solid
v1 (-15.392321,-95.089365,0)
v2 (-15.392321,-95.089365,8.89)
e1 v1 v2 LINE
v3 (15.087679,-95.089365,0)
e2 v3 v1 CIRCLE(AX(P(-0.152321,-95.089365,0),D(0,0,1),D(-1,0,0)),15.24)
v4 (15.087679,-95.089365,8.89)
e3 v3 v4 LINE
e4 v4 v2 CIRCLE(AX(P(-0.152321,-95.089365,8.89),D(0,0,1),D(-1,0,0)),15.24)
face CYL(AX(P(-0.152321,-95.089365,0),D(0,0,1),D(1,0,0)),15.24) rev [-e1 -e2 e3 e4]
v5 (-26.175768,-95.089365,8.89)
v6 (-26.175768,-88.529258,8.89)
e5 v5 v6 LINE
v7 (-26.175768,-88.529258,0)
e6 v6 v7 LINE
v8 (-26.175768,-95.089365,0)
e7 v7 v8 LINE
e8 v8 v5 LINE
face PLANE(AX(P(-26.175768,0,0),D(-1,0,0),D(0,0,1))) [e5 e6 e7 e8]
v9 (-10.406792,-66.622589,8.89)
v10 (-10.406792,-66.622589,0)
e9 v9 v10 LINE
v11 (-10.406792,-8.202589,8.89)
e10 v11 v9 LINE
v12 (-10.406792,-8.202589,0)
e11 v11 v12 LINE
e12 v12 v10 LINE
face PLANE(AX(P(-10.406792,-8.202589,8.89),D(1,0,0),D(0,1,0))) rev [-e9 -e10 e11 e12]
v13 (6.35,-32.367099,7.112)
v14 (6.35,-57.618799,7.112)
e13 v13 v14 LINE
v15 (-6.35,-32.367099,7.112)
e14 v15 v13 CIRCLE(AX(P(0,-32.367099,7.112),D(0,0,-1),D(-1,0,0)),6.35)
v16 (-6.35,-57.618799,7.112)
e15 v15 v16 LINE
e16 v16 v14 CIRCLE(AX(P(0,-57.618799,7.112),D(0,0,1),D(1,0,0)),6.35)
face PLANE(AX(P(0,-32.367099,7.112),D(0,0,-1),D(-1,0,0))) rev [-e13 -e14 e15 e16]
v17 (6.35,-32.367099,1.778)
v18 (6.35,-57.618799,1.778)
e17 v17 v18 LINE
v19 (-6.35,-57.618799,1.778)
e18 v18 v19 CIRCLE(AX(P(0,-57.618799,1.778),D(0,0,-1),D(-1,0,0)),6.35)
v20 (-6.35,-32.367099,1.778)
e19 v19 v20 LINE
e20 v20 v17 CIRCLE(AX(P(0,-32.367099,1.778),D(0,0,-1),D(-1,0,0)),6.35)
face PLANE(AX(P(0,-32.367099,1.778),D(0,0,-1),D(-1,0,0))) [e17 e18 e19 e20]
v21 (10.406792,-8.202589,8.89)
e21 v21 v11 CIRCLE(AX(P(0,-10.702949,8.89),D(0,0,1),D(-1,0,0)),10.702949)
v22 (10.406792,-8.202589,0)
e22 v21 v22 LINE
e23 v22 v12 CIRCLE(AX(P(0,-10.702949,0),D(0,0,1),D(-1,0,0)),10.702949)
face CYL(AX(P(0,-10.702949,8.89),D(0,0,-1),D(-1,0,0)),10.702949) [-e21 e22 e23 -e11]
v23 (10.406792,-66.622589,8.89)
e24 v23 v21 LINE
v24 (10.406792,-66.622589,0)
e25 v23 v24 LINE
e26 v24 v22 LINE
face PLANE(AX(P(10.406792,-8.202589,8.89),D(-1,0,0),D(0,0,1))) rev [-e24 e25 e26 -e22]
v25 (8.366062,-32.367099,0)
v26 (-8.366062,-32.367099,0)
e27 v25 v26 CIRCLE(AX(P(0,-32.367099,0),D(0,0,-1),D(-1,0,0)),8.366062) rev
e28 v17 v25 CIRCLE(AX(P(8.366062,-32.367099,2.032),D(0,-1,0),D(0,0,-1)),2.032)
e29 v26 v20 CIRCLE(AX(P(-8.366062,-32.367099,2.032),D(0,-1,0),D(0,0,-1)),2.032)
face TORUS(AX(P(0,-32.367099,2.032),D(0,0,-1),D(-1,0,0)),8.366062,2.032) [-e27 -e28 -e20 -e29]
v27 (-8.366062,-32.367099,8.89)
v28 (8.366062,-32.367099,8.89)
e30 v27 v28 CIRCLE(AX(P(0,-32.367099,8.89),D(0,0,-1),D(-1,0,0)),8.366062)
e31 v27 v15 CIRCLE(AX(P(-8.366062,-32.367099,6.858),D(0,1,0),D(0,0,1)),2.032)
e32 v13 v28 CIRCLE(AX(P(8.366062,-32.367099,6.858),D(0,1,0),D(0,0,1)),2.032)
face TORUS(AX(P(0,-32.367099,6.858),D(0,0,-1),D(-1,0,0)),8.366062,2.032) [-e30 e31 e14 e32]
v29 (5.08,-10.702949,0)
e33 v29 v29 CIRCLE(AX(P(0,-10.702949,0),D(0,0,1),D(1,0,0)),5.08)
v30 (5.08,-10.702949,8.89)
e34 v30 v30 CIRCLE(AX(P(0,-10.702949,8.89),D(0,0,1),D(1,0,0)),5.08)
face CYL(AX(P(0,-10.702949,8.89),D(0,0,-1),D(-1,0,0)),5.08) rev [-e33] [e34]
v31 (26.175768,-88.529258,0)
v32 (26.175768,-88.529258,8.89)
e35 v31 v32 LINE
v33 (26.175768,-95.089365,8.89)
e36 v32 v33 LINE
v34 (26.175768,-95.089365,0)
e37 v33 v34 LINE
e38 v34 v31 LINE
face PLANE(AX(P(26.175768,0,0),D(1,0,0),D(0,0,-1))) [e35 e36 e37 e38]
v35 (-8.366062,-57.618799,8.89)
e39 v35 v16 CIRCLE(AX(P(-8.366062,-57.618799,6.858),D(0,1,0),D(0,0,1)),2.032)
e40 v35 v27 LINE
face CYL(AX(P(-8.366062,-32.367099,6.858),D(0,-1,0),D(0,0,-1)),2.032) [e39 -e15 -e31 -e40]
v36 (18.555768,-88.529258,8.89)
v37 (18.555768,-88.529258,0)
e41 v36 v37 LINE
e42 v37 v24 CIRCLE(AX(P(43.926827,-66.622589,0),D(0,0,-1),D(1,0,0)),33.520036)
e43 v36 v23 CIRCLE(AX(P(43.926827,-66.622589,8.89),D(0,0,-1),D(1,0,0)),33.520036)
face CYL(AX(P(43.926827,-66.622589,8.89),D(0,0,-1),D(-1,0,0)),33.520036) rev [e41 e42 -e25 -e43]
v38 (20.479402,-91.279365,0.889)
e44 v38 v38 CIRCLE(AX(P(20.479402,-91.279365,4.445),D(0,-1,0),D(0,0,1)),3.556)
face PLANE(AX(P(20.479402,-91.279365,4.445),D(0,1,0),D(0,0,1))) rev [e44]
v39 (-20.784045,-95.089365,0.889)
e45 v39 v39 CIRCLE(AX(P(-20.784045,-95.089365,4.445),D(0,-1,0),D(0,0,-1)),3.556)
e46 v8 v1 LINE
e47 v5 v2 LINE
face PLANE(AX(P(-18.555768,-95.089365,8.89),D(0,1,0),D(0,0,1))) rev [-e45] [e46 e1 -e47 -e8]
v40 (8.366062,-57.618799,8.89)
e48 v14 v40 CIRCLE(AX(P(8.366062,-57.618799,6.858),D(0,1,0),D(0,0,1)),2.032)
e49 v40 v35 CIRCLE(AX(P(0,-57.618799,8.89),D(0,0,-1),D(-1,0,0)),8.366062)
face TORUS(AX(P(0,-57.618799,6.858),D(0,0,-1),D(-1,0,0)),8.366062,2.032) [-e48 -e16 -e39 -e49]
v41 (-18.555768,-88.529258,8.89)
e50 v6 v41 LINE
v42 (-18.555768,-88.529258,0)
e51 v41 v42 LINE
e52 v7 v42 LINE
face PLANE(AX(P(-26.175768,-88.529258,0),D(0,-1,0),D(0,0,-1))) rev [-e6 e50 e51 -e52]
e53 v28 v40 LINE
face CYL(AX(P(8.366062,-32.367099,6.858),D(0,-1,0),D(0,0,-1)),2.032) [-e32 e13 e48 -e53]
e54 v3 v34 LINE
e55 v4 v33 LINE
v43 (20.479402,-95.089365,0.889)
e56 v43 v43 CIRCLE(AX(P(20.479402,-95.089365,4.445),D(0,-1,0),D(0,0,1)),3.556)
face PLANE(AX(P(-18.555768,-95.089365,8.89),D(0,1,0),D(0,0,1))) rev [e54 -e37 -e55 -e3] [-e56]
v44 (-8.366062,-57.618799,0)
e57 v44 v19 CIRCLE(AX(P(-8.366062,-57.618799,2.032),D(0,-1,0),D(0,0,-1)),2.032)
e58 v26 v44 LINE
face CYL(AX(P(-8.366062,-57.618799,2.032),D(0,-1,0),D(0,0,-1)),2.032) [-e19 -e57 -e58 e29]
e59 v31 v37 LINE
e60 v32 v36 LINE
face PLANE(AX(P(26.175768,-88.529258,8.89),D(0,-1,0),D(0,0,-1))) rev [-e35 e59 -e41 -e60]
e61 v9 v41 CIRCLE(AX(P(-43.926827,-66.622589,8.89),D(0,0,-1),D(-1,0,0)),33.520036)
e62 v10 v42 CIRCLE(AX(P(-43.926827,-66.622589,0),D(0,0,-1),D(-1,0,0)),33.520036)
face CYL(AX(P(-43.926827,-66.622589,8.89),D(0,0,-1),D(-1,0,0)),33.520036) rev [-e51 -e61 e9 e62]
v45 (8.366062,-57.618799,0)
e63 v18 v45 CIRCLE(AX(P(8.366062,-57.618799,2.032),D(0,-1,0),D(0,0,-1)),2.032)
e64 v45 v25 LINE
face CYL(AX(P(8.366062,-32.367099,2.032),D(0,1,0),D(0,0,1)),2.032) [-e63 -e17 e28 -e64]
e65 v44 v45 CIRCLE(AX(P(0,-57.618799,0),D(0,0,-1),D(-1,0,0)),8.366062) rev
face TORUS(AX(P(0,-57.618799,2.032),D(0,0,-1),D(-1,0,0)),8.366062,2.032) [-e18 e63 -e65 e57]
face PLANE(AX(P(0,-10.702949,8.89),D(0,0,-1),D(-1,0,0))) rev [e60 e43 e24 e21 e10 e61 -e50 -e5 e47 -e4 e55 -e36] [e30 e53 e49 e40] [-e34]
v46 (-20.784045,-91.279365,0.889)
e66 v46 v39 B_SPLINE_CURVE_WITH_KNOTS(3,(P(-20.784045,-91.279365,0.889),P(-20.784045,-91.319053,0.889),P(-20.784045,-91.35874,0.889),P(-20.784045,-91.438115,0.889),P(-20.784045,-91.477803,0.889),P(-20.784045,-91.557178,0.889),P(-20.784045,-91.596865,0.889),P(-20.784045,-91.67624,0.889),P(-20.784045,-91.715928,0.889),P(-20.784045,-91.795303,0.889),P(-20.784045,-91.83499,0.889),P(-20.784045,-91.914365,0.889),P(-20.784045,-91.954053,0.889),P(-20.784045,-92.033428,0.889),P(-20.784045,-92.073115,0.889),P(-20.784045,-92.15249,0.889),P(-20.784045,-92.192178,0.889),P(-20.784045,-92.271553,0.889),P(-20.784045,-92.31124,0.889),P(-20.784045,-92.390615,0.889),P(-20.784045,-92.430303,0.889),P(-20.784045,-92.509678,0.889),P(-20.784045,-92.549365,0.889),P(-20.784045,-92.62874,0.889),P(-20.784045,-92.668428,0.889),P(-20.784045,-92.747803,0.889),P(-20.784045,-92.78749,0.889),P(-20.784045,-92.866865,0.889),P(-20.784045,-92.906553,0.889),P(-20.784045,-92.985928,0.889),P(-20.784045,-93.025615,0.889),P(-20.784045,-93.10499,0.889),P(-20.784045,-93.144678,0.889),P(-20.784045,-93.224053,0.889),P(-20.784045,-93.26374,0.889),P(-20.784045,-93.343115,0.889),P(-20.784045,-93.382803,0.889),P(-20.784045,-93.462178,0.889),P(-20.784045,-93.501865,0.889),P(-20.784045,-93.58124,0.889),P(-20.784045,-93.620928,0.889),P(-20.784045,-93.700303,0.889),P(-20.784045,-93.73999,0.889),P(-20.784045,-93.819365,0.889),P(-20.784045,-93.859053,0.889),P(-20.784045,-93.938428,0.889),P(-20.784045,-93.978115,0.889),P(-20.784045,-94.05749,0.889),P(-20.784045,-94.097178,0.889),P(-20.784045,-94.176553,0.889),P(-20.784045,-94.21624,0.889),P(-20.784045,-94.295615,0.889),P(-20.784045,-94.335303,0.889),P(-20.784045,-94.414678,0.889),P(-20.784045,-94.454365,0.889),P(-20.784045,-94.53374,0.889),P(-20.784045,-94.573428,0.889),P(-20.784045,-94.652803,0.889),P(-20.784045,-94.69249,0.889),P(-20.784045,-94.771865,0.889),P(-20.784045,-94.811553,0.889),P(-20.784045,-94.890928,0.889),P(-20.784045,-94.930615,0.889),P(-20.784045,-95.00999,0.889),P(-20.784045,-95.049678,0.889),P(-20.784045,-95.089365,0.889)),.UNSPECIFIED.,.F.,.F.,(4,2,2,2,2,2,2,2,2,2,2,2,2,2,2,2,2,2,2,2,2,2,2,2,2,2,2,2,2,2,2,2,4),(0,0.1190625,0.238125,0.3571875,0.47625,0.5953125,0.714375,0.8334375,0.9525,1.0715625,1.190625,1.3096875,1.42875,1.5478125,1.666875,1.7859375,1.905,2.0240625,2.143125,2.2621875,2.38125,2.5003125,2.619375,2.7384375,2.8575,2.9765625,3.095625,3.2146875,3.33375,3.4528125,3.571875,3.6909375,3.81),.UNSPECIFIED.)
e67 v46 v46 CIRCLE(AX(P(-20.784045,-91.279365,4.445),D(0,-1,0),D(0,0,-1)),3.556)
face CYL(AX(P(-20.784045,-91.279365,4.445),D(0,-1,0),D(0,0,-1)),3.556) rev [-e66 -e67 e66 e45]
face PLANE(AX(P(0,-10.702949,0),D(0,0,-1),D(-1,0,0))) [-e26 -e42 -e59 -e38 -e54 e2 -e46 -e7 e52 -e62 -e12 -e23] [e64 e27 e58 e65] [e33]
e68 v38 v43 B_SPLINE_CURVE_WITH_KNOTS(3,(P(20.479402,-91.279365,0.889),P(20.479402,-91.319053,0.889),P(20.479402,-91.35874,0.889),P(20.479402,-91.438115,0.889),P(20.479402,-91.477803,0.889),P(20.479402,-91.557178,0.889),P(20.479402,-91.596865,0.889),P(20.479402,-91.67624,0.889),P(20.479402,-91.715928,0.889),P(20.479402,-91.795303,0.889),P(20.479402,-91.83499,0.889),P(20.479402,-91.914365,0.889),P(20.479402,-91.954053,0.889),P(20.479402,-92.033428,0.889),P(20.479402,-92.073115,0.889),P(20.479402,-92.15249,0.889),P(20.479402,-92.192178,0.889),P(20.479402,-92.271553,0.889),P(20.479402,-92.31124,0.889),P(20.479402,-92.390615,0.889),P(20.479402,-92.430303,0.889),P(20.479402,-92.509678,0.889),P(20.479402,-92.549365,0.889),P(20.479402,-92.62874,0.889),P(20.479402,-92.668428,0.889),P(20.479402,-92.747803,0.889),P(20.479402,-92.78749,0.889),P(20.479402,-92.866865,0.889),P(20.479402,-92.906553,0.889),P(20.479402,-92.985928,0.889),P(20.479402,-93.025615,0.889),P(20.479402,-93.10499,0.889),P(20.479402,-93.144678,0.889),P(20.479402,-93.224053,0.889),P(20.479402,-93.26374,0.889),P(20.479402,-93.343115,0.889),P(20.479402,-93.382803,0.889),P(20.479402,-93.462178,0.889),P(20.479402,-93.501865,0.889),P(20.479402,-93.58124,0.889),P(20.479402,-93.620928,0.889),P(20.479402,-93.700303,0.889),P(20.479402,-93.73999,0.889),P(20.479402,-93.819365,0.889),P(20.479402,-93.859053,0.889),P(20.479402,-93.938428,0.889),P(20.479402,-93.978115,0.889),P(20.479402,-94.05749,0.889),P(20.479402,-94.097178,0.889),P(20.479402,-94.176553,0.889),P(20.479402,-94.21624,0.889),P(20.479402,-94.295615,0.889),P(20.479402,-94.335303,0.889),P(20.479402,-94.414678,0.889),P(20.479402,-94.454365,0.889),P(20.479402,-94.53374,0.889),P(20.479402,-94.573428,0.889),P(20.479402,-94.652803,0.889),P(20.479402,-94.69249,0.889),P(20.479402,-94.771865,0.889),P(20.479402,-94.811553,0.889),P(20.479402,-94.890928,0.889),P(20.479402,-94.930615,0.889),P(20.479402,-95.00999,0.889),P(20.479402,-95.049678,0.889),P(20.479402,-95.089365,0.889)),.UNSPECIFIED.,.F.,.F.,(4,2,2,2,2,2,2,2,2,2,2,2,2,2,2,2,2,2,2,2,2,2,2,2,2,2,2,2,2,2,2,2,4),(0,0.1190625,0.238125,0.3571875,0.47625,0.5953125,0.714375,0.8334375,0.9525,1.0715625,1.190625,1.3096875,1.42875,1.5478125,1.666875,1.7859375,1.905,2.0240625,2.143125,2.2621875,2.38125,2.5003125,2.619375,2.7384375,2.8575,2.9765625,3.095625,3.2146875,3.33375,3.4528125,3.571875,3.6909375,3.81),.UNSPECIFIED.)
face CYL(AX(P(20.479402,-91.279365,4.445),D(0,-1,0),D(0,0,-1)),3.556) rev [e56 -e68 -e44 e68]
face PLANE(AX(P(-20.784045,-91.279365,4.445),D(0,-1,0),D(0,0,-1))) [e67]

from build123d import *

# Parameters (mm, degrees)
SKETCH2_R           = 5.08
BOSS_EXTRUDE1_DEPTH = 8.89
CUT_EXTRUDE1_DEPTH  = 8.89
CUT_EXTRUDE4_DEPTH  = 1.778
CUT_EXTRUDE5_START  = -1.778
CUT_EXTRUDE5_DEPTH  = 1.778
SKETCH13_W          = 8.89
SKETCH13_H          = 6.560107066
BOSS_EXTRUDE6_DEPTH = 7.62
SKETCH14_W          = 8.89
SKETCH14_H          = 6.560107066
BOSS_EXTRUDE7_DEPTH = 7.62
FILLET1_R           = 2.032
SKETCH15_R          = 3.556
CUT_EXTRUDE6_DEPTH  = 3.81


with BuildPart() as part:
    # Sketch2 → Boss-Extrude1 (new body)
    with BuildSketch(Plane.XY):
        with BuildLine():
            Line((-10.406791551, -8.202588674), (-10.406791551, -66.622588674))
            ThreePointArc((-10.406791551, -66.622588674), (-12.510019722, -78.309204867), (-18.555768436, -88.529258158))
            Line((-18.555768436, -88.529258158), (-18.555768436, -95.089365224))
            Line((-18.555768436, -95.089365224), (18.555768436, -95.089365224))
            Line((18.555768436, -95.089365224), (18.555768436, -88.529258158))
            ThreePointArc((18.555768436, -88.529258158), (12.510019722, -78.309204867), (10.406791551, -66.622588674))
            Line((10.406791551, -66.622588674), (10.406791551, -8.202588674))
            ThreePointArc((10.406791551, -8.202588674), (0, 0), (-10.406791551, -8.202588674))
        make_face()
        with Locations((0, -10.702948686)):
            Circle(SKETCH2_R, mode=Mode.SUBTRACT)
    extrude(amount=BOSS_EXTRUDE1_DEPTH)

    # Sketch3 → Cut-Extrude1 (cut)
    with BuildSketch(Plane.XY.offset(8.89)):
        with BuildLine():
            Line((-15.392321471, -95.089365224), (15.087678529, -95.089365224))
            ThreePointArc((15.087678529, -95.089365224), (-0.152321471, -79.849365224), (-15.392321471, -95.089365224))
        make_face()
    extrude(amount=-CUT_EXTRUDE1_DEPTH, mode=Mode.SUBTRACT)

    # Sketch8 → Cut-Extrude4 (cut)
    with BuildSketch(Plane.XY.offset(8.89)):
        with BuildLine():
            Line((-6.35, -32.367098726), (-6.35, -57.618798646))
            ThreePointArc((-6.35, -57.618798646), (0, -63.968798646), (6.35, -57.618798646))
            Line((6.35, -57.618798646), (6.35, -32.367098726))
            ThreePointArc((6.35, -32.367098726), (0, -26.017098726), (-6.35, -32.367098726))
        make_face()
    extrude(amount=-CUT_EXTRUDE4_DEPTH, mode=Mode.SUBTRACT)

    # Sketch9 → Cut-Extrude5 (cut)
    with BuildSketch(Plane(origin=(0, 0, 0), x_dir=(-1, 0, 0), z_dir=(0, 0, -1)).offset(CUT_EXTRUDE5_START)):
        with BuildLine():
            Line((6.35, -57.618798646), (6.35, -32.367098726))
            ThreePointArc((6.35, -32.367098726), (0, -26.017098726), (-6.35, -32.367098726))
            Line((-6.35, -32.367098726), (-6.35, -57.618798646))
            ThreePointArc((-6.35, -57.618798646), (0, -63.968798646), (6.35, -57.618798646))
        make_face()
    extrude(amount=CUT_EXTRUDE5_DEPTH, mode=Mode.SUBTRACT)

    # Sketch13 → Boss-Extrude6 (add)
    with BuildSketch(Plane.ZY.offset(18.555768436)):
        with Locations((4.445, -91.809311691)):
            Rectangle(SKETCH13_W, SKETCH13_H)
    extrude(amount=BOSS_EXTRUDE6_DEPTH)

    # Sketch14 → Boss-Extrude7 (add)
    with BuildSketch(Plane(origin=(18.555768436, 0, 0), x_dir=(0, 0, -1), z_dir=(1, 0, 0))):
        with Locations((-4.445, -91.809311691)):
            Rectangle(SKETCH14_W, SKETCH14_H)
    extrude(amount=BOSS_EXTRUDE7_DEPTH)

    # Fillet1
    # the kernel refuses this fillet: 2.032 mm, written as the material it takes off along each edge
    with BuildSketch(Plane(origin=(0, -57.618798646, 0), x_dir=(1, 0, 0), z_dir=(0, 1, 0))) as fillet1_piece_1:
        with BuildLine():
            CenterArc((8.366062499, -2.032), FILLET1_R, 90, 82.819244219)
            Line((6.35, -1.778), (6.30967875, -1.77292))
            ThreePointArc((6.30967875, -1.77292), (6.30936, -0.889), (6.30936, 0))
            Line((6.30936, 0), (6.35, 0.04064))
            Line((6.35, 0.04064), (8.366062499, 0.04064))
            Line((8.366062499, 0.04064), (8.366062499, 0))
        make_face()
    revolve(axis=Axis((0, -57.618798646, 0), (0, 0, -1)), revolution_arc=180, mode=Mode.SUBTRACT)
    with BuildSketch(Plane(origin=(-6.35, -57.618798646, 0), x_dir=(-1, 0, 0), z_dir=(0, 1, 0)), Plane(origin=(6.35, -32.367098726, 0), x_dir=(1, 0, 0), z_dir=(0, -1, 0)), Plane(origin=(-6.35, -32.367098726, 8.89), x_dir=(-1, 0, 0), z_dir=(0, -1, 0)), Plane(origin=(6.35, -57.618798646, 8.89), x_dir=(1, 0, 0), z_dir=(0, 1, 0))) as fillet1_piece_2:
        with BuildLine():
            CenterArc((2.016062499, 2.032), FILLET1_R, 187.180755781, 82.819244219)
            Line((0, 1.778), (-0.04032125, 1.77292))
            ThreePointArc((-0.04032125, 1.77292), (-0.04064, 0.889), (-0.04064, 0))
            Line((-0.04064, 0), (0, -0.04064))
            Line((0, -0.04064), (2.016062499, -0.04064))
            Line((2.016062499, -0.04064), (2.016062499, 0))
        make_face()
    extrude(amount=25.251699921, mode=Mode.SUBTRACT)
    with BuildSketch(Plane(origin=(0, -32.367098726, 0), x_dir=(-1, 0, 0), z_dir=(0, -1, 0))) as fillet1_piece_3:
        with BuildLine():
            CenterArc((8.366062499, -2.032), FILLET1_R, 90, 82.819244219)
            Line((6.35, -1.778), (6.30967875, -1.77292))
            ThreePointArc((6.30967875, -1.77292), (6.30936, -0.889), (6.30936, 0))
            Line((6.30936, 0), (6.35, 0.04064))
            Line((6.35, 0.04064), (8.366062499, 0.04064))
            Line((8.366062499, 0.04064), (8.366062499, 0))
        make_face()
    revolve(axis=Axis((0, -32.367098726, 0), (0, 0, -1)), revolution_arc=180, mode=Mode.SUBTRACT)
    with BuildSketch(Plane(origin=(0, -32.367098726, 8.89), x_dir=(1, 0, 0), z_dir=(0, -1, 0))) as fillet1_piece_4:
        with BuildLine():
            CenterArc((8.366062499, -2.032), FILLET1_R, 90, 82.819244219)
            Line((6.35, -1.778), (6.30967875, -1.77292))
            ThreePointArc((6.30967875, -1.77292), (6.30936, -0.889), (6.30936, 0))
            Line((6.30936, 0), (6.35, 0.04064))
            Line((6.35, 0.04064), (8.366062499, 0.04064))
            Line((8.366062499, 0.04064), (8.366062499, 0))
        make_face()
    revolve(axis=Axis((0, -32.367098726, 8.89), (0, 0, 1)), revolution_arc=180, mode=Mode.SUBTRACT)
    with BuildSketch(Plane(origin=(0, -57.618798646, 8.89), x_dir=(-1, 0, 0), z_dir=(0, 1, 0))) as fillet1_piece_5:
        with BuildLine():
            CenterArc((8.366062499, -2.032), FILLET1_R, 90, 82.819244219)
            Line((6.35, -1.778), (6.30967875, -1.77292))
            ThreePointArc((6.30967875, -1.77292), (6.30936, -0.889), (6.30936, 0))
            Line((6.30936, 0), (6.35, 0.04064))
            Line((6.35, 0.04064), (8.366062499, 0.04064))
            Line((8.366062499, 0.04064), (8.366062499, 0))
        make_face()
    revolve(axis=Axis((0, -57.618798646, 8.89), (0, 0, 1)), revolution_arc=180, mode=Mode.SUBTRACT)

    # Sketch15 → Cut-Extrude6 (cut)
    with BuildSketch(Plane.XZ.offset(95.089365224)):
        with Locations(Location((-20.784044953, 4.445, 0), (0, 0, 270))):
            Circle(SKETCH15_R)
        with Locations(Location((20.479402012, 4.445, 0), (0, 0, 270))):
            Circle(SKETCH15_R)
    extrude(amount=-CUT_EXTRUDE6_DEPTH, mode=Mode.SUBTRACT)


solid = part.part
